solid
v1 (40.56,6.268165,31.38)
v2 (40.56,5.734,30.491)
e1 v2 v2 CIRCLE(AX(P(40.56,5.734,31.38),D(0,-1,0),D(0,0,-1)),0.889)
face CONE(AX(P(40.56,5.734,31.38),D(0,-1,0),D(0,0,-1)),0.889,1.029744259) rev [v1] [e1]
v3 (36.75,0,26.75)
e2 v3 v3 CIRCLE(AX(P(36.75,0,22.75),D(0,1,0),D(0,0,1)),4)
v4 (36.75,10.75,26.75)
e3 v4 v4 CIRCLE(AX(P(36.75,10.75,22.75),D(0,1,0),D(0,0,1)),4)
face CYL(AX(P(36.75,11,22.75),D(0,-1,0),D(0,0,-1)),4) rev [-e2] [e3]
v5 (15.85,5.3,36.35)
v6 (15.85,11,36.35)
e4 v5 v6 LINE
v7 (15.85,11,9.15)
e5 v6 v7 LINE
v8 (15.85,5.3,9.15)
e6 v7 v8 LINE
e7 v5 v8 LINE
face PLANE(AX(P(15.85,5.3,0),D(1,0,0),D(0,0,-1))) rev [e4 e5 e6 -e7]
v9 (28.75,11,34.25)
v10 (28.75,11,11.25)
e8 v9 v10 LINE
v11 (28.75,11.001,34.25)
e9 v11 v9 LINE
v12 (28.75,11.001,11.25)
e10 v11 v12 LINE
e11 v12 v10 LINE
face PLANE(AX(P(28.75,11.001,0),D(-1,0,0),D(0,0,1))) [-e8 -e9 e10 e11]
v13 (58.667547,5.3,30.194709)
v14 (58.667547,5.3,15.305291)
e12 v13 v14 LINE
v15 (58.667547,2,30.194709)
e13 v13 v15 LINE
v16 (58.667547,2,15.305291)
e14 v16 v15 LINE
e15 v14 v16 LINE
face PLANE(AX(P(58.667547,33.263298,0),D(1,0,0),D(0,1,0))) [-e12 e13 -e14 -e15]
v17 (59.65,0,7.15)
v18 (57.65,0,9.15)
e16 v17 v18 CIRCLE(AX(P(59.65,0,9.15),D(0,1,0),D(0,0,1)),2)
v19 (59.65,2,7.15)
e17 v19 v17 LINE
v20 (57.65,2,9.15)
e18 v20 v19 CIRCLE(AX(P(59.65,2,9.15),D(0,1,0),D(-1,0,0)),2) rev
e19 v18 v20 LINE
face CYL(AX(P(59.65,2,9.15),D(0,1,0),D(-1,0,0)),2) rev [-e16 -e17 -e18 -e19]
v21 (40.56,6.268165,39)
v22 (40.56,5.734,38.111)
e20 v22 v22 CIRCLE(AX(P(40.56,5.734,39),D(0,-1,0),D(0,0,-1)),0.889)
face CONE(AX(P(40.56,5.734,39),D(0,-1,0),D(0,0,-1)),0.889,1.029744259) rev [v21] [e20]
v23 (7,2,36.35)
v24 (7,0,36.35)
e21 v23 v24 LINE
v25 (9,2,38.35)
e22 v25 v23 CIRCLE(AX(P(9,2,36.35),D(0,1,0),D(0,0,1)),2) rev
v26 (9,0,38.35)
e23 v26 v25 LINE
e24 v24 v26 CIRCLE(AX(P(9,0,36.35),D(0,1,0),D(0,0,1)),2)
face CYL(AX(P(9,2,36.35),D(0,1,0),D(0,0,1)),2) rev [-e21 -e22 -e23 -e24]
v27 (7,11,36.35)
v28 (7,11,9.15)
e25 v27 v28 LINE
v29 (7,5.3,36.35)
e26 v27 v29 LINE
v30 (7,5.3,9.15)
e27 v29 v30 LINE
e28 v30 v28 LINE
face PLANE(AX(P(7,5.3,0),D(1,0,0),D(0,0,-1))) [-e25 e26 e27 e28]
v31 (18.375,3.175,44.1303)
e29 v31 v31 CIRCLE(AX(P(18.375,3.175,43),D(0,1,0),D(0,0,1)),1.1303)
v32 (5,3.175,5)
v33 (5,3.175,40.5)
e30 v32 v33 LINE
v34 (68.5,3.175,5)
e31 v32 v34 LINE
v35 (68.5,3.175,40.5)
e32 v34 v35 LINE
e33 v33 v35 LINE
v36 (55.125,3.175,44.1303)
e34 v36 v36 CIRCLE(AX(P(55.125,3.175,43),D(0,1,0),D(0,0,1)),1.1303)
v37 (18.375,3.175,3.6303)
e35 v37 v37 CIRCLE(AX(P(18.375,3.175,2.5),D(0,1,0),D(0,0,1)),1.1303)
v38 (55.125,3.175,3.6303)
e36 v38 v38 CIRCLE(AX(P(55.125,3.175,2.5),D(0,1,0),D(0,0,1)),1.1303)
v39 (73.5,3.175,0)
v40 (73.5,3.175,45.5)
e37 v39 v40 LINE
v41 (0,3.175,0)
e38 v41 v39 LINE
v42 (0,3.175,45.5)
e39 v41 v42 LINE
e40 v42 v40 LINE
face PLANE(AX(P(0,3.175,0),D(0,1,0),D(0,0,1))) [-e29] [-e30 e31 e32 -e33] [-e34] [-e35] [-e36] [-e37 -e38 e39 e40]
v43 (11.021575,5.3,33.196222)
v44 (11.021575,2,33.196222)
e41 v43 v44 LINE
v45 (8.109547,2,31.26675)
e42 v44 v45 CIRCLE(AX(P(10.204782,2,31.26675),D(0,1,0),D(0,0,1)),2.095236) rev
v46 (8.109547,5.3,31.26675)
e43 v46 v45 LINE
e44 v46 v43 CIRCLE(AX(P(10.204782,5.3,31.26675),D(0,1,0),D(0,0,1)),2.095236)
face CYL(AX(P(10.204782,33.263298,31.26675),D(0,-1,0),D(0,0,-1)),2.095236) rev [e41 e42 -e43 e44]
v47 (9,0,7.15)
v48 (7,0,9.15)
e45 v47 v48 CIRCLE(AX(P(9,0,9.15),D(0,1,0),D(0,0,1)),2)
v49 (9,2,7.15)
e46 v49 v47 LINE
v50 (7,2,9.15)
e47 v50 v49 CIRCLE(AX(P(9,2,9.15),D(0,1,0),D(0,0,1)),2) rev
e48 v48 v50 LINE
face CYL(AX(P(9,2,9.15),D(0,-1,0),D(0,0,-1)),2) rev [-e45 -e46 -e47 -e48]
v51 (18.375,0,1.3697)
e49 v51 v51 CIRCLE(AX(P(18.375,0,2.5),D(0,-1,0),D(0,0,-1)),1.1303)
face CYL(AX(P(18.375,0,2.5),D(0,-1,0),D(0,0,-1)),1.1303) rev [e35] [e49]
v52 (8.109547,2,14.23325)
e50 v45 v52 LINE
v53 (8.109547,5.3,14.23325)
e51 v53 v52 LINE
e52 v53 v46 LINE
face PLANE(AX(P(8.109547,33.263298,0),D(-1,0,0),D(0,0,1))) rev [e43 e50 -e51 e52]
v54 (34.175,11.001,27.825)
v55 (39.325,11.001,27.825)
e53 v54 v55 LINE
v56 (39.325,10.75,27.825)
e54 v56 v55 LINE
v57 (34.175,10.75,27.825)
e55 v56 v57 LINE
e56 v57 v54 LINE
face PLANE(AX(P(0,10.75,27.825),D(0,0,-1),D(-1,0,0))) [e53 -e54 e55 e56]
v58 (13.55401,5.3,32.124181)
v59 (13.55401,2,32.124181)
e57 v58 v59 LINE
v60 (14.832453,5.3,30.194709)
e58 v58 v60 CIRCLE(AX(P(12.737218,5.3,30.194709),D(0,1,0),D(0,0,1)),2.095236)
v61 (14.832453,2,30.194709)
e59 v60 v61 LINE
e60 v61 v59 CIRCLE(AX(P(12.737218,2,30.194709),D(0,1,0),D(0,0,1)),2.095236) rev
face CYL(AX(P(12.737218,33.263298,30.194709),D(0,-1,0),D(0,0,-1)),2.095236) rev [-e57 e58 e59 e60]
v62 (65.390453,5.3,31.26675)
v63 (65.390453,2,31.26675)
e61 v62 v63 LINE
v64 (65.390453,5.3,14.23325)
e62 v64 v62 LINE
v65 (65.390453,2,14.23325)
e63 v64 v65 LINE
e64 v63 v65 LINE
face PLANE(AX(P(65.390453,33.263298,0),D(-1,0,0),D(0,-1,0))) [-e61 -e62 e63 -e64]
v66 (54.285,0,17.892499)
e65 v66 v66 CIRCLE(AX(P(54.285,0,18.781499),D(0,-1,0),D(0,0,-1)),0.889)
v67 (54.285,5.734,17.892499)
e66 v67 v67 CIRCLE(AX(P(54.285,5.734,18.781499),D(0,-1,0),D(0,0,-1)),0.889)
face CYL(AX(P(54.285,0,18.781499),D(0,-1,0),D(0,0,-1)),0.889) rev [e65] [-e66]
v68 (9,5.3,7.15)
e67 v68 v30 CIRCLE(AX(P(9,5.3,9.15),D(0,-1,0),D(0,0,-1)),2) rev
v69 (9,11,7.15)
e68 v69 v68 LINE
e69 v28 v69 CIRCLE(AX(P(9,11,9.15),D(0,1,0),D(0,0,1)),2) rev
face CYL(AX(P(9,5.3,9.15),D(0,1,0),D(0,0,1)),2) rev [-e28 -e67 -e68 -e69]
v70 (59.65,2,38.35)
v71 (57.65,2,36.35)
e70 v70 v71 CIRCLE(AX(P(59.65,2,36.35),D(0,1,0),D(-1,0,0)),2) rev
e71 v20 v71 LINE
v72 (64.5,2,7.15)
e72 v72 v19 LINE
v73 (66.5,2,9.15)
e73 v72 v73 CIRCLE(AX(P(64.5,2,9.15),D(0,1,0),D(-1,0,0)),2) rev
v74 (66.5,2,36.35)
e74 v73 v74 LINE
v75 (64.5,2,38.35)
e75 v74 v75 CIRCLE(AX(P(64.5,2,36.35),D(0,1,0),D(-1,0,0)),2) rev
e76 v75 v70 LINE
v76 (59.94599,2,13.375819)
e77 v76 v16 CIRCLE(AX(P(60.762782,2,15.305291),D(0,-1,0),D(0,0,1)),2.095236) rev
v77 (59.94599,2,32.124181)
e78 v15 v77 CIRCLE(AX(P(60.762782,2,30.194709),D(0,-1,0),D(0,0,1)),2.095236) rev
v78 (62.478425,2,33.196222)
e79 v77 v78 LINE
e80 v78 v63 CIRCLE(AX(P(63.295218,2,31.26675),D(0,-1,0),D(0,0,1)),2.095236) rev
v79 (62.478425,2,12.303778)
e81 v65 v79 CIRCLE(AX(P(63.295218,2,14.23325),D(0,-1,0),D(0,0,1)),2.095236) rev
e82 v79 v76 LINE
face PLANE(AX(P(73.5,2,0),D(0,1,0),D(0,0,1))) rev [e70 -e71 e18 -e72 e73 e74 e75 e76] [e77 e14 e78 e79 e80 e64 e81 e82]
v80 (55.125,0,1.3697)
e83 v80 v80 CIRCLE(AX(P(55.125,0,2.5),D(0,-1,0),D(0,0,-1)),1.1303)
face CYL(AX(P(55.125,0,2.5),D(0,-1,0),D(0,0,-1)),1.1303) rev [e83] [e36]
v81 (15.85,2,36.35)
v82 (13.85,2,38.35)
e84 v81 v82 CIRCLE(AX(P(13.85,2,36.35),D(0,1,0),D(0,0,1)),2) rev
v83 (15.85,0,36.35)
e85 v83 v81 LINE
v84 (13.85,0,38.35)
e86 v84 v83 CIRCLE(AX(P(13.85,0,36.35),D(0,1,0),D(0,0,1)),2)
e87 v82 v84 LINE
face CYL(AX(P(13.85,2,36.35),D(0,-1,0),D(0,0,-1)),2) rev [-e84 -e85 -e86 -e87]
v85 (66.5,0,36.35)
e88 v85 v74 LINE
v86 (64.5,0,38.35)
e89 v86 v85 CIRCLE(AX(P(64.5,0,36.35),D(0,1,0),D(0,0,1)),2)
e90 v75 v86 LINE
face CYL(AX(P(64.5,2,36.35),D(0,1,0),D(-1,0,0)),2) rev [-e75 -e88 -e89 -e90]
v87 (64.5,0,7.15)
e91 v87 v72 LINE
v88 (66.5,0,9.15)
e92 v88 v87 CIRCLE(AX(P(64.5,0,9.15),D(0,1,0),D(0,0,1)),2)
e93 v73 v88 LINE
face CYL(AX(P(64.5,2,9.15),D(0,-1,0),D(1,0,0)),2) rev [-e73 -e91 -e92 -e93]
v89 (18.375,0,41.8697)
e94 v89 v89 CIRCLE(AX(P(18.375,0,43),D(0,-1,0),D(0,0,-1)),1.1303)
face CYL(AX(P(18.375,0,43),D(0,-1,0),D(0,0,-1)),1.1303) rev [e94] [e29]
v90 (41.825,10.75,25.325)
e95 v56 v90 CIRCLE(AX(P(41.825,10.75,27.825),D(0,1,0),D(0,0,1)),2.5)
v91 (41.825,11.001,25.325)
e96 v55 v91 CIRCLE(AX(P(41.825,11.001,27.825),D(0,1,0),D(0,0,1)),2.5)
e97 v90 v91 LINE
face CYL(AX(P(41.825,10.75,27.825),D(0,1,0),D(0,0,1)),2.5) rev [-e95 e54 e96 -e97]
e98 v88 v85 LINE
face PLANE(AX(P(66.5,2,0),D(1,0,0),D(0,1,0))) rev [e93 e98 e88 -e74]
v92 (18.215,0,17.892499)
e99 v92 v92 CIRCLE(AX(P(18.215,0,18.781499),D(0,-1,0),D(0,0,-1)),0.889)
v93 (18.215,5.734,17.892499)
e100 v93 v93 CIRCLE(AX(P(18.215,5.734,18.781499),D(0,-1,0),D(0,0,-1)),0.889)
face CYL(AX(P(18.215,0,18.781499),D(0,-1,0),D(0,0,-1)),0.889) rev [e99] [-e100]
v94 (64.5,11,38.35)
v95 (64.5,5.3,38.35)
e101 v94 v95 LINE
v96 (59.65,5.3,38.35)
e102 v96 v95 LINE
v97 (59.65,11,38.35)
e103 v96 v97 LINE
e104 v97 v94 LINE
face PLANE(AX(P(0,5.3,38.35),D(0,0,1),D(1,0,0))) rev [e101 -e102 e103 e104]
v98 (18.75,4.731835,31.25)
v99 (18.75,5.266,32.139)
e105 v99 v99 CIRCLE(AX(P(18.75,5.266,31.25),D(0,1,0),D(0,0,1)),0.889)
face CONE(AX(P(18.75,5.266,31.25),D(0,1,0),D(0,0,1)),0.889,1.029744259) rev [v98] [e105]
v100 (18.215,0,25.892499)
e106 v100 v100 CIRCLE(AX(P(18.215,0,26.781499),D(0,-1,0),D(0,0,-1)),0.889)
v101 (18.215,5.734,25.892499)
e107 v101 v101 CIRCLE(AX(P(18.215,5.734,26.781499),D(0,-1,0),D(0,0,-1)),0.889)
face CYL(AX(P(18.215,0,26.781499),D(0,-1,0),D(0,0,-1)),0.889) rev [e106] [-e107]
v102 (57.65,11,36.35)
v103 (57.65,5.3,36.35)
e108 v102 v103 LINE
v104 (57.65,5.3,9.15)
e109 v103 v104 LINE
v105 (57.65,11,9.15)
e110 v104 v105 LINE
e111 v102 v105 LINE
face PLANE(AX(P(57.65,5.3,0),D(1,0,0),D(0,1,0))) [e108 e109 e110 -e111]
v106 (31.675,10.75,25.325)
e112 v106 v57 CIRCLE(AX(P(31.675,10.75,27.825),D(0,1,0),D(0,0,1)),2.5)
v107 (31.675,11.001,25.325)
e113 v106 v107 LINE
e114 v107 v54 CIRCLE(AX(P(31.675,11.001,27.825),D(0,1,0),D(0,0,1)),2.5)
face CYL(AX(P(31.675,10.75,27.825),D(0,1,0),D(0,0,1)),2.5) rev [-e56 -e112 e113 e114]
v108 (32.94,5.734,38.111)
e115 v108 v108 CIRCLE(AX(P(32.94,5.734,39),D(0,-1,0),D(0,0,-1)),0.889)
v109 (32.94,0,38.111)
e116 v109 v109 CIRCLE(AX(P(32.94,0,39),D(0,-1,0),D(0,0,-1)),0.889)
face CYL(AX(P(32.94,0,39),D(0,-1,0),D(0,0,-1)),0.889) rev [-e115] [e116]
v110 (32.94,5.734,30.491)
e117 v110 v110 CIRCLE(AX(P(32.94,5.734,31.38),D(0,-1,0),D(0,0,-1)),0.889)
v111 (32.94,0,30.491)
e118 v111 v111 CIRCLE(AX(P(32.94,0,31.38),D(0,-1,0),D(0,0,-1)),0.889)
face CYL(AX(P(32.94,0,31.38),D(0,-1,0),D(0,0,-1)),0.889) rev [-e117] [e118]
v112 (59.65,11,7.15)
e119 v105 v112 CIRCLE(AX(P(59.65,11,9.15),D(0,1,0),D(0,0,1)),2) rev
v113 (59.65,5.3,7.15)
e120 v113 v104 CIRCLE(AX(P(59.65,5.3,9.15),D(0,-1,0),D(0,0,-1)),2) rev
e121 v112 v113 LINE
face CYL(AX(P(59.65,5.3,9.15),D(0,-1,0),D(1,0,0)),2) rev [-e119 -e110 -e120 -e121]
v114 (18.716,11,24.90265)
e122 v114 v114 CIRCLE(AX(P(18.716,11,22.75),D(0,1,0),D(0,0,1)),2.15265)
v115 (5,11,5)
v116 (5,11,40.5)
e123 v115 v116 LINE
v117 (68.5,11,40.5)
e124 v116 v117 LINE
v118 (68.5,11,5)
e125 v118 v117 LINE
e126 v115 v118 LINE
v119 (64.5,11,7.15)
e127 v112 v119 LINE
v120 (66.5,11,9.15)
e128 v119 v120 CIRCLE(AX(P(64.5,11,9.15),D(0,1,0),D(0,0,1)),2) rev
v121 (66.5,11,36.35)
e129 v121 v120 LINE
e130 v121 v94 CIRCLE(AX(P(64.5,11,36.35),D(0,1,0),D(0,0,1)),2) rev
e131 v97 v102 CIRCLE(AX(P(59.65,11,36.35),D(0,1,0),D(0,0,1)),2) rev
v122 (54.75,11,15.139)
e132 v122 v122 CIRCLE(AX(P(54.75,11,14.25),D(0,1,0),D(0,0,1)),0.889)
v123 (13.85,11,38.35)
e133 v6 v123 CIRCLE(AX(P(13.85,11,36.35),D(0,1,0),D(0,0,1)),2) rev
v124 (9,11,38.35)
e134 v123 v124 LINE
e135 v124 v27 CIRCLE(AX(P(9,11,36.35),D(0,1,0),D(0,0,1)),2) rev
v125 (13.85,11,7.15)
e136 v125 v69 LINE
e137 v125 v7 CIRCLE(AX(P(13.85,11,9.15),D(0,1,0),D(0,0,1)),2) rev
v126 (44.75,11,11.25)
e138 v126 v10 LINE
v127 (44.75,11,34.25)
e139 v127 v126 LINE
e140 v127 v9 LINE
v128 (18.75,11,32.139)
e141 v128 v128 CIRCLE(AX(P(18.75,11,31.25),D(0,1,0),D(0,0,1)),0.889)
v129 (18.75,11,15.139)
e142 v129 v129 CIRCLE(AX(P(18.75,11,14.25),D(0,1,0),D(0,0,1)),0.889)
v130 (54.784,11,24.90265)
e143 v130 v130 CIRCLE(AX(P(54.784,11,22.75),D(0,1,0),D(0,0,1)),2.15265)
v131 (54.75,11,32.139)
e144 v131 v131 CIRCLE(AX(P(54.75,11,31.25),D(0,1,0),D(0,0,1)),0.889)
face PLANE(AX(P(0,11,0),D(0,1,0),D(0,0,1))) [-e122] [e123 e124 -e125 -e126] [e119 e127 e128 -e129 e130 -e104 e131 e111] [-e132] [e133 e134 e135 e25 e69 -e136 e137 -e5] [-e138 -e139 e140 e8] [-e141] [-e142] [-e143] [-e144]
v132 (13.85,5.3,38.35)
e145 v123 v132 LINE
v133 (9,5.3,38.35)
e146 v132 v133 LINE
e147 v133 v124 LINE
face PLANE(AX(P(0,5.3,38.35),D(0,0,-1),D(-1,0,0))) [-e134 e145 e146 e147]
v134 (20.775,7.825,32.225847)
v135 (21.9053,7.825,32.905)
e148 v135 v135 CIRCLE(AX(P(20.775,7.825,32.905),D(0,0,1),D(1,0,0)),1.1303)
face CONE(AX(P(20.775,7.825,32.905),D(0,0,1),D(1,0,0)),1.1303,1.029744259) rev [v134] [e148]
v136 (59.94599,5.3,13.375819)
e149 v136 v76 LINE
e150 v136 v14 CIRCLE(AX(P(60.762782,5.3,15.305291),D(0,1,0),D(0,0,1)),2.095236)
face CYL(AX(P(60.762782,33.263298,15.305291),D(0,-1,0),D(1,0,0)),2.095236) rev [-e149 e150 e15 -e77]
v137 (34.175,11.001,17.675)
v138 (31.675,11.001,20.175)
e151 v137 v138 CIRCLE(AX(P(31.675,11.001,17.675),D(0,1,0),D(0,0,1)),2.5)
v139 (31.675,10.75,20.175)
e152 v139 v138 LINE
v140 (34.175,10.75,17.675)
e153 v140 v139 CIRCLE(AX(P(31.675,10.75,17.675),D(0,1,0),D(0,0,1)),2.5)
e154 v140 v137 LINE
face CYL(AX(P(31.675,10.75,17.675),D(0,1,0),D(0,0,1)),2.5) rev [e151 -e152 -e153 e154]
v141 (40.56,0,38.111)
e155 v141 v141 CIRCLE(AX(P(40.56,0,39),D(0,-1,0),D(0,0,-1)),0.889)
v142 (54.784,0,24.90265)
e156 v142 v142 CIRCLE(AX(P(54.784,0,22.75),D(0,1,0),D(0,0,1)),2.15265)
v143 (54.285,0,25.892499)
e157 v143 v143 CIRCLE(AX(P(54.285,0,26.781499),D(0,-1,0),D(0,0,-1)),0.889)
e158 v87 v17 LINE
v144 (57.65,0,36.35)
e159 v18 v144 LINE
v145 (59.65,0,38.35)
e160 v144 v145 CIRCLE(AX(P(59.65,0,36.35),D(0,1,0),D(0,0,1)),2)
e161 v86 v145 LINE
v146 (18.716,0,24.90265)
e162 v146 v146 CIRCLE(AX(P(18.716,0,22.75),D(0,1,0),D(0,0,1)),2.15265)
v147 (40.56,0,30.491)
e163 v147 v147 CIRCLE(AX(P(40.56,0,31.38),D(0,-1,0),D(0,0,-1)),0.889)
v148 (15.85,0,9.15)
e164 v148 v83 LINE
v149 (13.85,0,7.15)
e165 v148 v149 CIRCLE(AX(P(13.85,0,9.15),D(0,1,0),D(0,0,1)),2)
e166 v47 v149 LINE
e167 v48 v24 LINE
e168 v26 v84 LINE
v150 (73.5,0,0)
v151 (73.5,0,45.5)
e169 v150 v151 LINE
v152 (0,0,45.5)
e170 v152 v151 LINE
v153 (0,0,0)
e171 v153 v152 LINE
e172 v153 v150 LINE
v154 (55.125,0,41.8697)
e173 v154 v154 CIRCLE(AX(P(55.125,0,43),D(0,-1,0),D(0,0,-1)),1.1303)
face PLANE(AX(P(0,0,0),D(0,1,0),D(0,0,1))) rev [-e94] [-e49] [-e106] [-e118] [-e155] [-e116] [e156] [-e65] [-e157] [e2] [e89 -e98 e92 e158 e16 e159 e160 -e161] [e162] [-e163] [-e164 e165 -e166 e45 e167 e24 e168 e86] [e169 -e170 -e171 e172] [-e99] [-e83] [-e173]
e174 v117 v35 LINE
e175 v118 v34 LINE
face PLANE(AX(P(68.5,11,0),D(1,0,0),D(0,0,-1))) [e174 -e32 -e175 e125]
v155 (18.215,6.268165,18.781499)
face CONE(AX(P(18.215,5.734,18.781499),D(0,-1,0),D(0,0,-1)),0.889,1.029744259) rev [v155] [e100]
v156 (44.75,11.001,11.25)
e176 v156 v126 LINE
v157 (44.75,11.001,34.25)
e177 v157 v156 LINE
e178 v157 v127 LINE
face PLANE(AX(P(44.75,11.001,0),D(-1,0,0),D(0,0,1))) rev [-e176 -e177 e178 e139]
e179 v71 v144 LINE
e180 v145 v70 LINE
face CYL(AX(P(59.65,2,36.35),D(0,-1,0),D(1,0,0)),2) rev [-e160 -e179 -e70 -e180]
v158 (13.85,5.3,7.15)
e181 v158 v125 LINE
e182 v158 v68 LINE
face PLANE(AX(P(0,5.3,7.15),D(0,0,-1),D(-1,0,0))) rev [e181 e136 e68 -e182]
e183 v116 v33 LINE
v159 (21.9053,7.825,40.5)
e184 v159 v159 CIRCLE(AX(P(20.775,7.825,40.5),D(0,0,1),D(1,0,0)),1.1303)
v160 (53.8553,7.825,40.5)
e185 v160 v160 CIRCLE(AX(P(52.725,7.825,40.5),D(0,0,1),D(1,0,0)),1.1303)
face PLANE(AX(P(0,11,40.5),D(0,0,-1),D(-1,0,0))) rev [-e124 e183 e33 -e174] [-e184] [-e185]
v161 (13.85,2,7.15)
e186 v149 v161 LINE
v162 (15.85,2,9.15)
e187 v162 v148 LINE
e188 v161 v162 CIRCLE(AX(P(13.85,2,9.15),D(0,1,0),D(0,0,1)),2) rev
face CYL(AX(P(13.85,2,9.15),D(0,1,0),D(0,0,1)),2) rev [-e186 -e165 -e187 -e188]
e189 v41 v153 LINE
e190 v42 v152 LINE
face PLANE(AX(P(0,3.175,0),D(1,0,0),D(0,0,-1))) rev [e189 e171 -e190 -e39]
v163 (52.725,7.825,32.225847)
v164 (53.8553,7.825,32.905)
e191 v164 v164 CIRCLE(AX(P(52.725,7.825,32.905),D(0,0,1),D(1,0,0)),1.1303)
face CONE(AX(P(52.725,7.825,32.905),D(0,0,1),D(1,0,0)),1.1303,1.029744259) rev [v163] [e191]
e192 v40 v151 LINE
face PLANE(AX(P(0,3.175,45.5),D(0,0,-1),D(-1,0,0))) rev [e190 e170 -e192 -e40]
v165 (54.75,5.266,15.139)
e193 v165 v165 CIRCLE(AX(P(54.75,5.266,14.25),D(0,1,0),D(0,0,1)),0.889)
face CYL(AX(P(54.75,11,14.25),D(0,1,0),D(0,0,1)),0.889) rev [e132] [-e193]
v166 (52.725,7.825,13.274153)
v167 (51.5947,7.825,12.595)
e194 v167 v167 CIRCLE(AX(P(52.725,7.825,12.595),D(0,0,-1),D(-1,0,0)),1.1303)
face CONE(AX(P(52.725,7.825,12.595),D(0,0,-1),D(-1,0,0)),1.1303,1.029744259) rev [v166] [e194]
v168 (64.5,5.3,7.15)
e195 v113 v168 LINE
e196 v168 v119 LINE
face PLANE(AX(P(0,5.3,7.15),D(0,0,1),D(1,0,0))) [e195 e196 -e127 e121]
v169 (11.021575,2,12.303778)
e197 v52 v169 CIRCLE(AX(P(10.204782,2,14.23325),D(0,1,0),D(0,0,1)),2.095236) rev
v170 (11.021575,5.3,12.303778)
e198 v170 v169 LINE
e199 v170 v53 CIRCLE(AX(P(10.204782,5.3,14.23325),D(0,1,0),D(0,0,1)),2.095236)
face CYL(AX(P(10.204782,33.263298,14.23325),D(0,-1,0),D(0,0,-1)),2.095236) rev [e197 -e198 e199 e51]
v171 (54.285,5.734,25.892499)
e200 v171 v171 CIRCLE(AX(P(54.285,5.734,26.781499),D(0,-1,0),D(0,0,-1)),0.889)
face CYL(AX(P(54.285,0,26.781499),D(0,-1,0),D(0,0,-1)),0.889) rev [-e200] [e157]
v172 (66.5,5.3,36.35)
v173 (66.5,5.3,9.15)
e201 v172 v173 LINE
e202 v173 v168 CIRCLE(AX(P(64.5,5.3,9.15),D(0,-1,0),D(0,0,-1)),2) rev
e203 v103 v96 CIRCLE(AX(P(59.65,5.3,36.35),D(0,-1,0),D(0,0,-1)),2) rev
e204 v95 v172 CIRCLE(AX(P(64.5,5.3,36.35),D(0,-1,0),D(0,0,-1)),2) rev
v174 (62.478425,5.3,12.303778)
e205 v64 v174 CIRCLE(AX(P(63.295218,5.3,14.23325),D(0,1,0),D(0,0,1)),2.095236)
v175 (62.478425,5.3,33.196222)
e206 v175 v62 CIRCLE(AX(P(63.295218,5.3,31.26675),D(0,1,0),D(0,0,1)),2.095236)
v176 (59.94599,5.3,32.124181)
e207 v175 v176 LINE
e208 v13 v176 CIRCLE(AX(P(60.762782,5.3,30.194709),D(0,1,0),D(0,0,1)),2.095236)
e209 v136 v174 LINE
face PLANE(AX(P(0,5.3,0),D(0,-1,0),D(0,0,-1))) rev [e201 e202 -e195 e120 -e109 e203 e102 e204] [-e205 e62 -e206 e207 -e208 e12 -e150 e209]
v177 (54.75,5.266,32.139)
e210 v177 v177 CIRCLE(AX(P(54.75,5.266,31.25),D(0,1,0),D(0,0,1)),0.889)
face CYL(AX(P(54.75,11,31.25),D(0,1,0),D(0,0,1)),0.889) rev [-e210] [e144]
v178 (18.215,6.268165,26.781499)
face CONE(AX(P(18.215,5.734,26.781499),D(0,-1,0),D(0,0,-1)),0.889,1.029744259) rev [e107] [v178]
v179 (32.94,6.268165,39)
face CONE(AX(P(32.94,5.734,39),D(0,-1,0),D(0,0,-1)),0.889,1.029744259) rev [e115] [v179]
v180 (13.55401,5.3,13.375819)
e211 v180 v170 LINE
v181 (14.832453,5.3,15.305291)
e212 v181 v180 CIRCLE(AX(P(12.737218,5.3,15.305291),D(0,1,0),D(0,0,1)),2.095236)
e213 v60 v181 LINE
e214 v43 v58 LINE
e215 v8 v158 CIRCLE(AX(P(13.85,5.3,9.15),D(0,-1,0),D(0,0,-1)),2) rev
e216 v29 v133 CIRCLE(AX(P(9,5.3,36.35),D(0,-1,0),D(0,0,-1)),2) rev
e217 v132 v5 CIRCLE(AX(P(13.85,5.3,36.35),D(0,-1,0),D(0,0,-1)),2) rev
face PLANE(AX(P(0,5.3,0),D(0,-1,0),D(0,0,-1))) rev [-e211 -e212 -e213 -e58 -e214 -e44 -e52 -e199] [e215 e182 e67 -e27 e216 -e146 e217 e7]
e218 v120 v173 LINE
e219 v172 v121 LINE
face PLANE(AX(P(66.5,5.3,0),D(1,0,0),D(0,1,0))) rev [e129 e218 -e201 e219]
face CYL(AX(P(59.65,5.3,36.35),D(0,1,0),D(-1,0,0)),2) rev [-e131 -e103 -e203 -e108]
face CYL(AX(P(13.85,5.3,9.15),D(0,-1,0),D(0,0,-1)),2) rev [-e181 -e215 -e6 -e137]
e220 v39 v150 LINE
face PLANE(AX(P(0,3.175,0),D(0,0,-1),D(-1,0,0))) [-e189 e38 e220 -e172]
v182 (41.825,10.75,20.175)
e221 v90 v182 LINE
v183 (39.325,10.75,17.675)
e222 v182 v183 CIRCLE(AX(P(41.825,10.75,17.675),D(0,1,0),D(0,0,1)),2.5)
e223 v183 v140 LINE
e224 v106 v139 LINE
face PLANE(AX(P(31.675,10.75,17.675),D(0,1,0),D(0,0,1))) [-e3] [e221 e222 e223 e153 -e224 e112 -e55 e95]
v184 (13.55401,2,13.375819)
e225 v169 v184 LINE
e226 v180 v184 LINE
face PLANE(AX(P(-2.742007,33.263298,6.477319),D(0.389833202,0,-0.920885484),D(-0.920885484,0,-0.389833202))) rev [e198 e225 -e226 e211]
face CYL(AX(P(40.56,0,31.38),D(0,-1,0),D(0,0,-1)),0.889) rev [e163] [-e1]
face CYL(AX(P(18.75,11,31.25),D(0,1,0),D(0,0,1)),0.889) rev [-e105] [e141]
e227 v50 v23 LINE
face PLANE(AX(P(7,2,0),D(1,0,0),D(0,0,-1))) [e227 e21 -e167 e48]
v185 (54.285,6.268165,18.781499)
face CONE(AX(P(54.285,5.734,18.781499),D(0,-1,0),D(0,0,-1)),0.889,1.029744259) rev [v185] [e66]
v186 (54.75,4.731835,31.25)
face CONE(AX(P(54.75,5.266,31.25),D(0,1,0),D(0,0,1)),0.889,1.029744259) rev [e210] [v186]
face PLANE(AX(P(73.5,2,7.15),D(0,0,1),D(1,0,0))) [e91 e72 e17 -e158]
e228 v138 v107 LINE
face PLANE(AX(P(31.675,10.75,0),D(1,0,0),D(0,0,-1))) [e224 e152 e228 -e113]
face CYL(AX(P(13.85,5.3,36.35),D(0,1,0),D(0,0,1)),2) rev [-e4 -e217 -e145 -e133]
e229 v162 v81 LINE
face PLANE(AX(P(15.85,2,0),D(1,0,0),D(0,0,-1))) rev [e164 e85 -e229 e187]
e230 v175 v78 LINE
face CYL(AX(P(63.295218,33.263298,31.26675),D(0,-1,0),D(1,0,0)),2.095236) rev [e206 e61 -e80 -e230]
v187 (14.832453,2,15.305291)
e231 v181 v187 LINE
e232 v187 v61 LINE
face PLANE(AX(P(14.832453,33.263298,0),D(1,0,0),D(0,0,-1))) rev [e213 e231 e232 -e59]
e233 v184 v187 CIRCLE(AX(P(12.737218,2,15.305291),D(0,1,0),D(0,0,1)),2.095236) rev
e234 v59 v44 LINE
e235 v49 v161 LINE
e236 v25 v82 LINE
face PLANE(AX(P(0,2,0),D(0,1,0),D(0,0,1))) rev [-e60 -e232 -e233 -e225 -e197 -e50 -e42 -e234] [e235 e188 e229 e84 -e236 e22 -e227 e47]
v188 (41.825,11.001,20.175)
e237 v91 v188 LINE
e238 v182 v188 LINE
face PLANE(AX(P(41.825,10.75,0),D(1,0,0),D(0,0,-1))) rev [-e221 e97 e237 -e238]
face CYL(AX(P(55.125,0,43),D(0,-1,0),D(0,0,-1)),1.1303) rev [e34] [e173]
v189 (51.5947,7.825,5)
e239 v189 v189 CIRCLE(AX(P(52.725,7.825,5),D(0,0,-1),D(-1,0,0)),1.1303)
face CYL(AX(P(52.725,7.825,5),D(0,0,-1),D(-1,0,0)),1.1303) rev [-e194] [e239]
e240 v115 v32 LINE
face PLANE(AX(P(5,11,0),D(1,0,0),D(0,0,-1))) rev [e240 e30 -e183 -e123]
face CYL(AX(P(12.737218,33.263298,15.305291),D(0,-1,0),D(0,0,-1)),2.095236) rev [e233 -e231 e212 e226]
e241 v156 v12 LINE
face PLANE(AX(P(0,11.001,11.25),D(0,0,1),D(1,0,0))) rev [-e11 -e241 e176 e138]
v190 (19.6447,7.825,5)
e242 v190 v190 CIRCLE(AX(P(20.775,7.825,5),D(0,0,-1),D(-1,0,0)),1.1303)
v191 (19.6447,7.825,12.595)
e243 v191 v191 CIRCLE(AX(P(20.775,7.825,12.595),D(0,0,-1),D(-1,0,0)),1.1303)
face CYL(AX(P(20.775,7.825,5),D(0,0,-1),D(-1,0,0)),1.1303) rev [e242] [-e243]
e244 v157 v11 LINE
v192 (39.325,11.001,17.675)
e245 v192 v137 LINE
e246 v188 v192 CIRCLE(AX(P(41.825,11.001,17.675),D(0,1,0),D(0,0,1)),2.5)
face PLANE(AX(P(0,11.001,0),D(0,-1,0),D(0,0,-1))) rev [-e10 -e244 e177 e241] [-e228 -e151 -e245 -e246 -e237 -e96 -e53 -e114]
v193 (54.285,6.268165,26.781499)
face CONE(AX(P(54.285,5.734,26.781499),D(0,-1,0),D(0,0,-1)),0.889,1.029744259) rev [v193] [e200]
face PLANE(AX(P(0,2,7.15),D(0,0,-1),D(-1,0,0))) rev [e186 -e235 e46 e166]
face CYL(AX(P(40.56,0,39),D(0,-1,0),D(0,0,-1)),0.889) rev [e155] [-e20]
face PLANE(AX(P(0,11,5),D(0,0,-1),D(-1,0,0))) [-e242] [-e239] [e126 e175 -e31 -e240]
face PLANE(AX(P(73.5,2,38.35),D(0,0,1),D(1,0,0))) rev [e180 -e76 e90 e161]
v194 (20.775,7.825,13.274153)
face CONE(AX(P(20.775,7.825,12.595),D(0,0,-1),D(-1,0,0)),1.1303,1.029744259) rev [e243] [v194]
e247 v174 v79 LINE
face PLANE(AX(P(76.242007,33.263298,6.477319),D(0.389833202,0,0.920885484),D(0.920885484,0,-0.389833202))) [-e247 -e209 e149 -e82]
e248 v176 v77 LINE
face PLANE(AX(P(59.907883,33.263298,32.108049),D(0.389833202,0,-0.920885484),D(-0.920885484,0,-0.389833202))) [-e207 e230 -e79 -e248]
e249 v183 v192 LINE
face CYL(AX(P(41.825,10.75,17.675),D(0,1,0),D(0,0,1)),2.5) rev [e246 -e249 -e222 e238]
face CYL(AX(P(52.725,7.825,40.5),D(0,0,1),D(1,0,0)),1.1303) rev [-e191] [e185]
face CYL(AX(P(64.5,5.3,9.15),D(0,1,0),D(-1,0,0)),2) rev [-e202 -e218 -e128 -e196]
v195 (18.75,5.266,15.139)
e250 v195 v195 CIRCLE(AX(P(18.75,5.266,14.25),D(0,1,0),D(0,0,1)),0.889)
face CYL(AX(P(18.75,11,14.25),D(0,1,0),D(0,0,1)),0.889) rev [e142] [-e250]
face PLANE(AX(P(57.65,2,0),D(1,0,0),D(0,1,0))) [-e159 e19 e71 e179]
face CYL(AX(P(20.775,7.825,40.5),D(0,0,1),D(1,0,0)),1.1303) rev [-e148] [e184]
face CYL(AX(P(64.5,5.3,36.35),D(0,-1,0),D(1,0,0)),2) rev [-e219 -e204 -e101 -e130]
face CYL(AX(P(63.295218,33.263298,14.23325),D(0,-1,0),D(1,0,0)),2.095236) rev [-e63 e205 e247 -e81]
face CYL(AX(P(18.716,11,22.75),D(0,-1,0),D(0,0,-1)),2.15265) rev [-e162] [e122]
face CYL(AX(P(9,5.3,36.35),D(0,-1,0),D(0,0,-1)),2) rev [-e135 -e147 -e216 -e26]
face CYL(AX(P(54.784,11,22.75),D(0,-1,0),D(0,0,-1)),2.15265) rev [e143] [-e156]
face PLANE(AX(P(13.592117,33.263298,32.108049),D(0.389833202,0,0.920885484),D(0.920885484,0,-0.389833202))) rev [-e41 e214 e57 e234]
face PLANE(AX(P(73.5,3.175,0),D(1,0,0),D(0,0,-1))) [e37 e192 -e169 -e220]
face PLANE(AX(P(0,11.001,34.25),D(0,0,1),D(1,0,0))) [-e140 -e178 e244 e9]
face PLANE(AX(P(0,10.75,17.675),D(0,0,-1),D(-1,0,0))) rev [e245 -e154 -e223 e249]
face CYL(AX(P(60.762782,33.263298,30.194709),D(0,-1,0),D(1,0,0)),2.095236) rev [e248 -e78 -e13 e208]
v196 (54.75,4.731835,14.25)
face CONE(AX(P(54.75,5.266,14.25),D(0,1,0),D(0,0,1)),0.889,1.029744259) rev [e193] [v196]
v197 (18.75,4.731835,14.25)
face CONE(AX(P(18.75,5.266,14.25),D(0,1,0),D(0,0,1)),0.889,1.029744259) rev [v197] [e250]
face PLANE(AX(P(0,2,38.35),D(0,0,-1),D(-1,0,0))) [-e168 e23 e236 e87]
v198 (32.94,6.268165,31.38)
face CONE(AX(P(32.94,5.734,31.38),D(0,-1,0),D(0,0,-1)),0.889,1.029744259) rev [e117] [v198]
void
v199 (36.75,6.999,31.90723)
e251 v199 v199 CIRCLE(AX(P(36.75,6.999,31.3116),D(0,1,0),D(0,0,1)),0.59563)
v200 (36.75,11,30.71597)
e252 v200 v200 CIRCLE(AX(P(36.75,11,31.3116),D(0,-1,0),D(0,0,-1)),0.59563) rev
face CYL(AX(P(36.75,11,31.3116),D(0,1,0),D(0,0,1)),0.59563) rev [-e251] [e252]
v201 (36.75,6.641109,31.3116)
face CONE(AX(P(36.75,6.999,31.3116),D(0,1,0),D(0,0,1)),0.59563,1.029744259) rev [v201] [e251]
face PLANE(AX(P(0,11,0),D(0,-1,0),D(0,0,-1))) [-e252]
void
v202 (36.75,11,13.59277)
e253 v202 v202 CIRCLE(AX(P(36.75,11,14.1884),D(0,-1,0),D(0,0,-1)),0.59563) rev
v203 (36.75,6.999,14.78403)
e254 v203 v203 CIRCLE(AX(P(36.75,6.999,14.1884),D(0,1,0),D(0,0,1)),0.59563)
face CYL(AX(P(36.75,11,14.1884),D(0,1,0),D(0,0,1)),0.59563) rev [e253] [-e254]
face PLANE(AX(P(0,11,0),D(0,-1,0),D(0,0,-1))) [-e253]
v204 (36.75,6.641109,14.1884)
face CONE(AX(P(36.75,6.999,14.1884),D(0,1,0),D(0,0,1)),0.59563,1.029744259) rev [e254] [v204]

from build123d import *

# Parameters (mm, degrees)
MAIN_SKETCH_W                         = 73.5
MAIN_SKETCH_H                         = 45.5
MAIN_SKETCH_W_2                       = 63.5
MAIN_SKETCH_H_2                       = 35.5
LIP_DEPTH                             = 3.175
MOUNTING_BASE_OUTLINE_W               = 63.5
MOUNTING_BASE_OUTLINE_H               = 35.5
MOUNTING_BASE_OUTLINE_R               = 2.15265
MOUNTING_BASE_OUTLINE_R_2             = 4
MOUNTING_BASE_DEPTH                   = 11
HEATER_CART_4_40_TAPS_D               = 2.2606
HEATER_CART_4_40_TAPS_DEPTH           = 7.595
HEATER_CART_4_40_TAPS_TIP             = 0.679152758
HEATER_CART_4_40_TAPS_ON_FACE_2_D     = 2.2606
HEATER_CART_4_40_TAPS_ON_FACE_2_DEPTH = 7.595
HEATER_CART_4_40_TAPS_ON_FACE_2_TIP   = 0.679152758
MAIN_SKETCH_12_W                      = 8.85
MAIN_SKETCH_12_H                      = 31.2
BOTTOM_SQUARE_CUTOUT_DEPTH            = 2
SQUARE_MICRO_D_CUTOUT_START           = 5.3
SQUARE_MICRO_D_CUTOUT_OUTLINE_W       = 8.85
SQUARE_MICRO_D_CUTOUT_OUTLINE_H       = 31.2
SQUARE_MICRO_D_CUTOUT_DEPTH           = 5.7
MAIN_SKETCH_7_R                       = 0.285
ROUND_MICRO_D_CUTOUT_DEPTH            = 11
INTERNAL_CORNER_CUTOUTS_FILLET_R      = 2
CHIP_CLAMP_0_80_TAPS_AT_2_COUNT       = 2
CHIP_CLAMP_0_80_TAPS_AT_2_PITCH       = 17.1232
CHIP_CLAMP_0_80_TAPS_AT_3_COUNT       = 2
CHIP_CLAMP_0_80_TAPS_AT_3_PITCH       = 17.1232
CHIP_POCKET_START                     = 11
MAIN_SKETCH_6_R                       = 2.5
MAIN_SKETCH_6_W                       = 10.15
MAIN_SKETCH_6_H                       = 10.15
CHIP_POCKET_DEPTH                     = 0.25
F_2_56_CLOSE_CLEAR_43_0_089_D         = 2.2606
PCB_2_56_TAPS_D                       = 1.778
PCB_2_56_TAPS_DEPTH                   = 5.734
PCB_2_56_TAPS_TIP                     = 0.53416509
BOTTOM_COVER_2_56_TAPS_D              = 1.778
BOTTOM_COVER_2_56_TAPS_DEPTH          = 5.734
BOTTOM_COVER_2_56_TAPS_TIP            = 0.53416509
F_2_56_TAPPED_HOLE1_D                 = 1.778
F_2_56_TAPPED_HOLE1_DEPTH             = 5.734
F_2_56_TAPPED_HOLE1_TIP               = 0.53416509
SUPRESS_START                         = 11.001
SKETCH14_W                            = 16
SKETCH14_H                            = 23
SUPRESS_IF_NOT_SIMULATING_DEPTH       = 0.001


# Read off the part's stored shape, not the designer's step: Mounting_Base, Square_Micro_D_Cutout
with BuildPart() as part:
    # Main_Sketch → Lip (new body)
    with BuildSketch(Plane(origin=(0, 0, 0), x_dir=(1, 0, 0), z_dir=(0, 1, 0))):
        with Locations((36.75, -22.75)):
            Rectangle(MAIN_SKETCH_W, MAIN_SKETCH_H)
        with Locations((36.75, -22.75)):
            Rectangle(MAIN_SKETCH_W_2, MAIN_SKETCH_H_2, mode=Mode.SUBTRACT)
    extrude(amount=LIP_DEPTH)

    # Mounting_Base outline → Mounting_Base (add)
    with BuildSketch(Plane(origin=(0, 0, 0), x_dir=(1, 0, 0), z_dir=(0, 1, 0))):
        with Locations((36.75, -22.75)):
            Rectangle(MOUNTING_BASE_OUTLINE_W, MOUNTING_BASE_OUTLINE_H)
        with Locations((18.716, -22.75)):
            Circle(MOUNTING_BASE_OUTLINE_R, mode=Mode.SUBTRACT)
        with Locations((36.75, -22.75)):
            Circle(MOUNTING_BASE_OUTLINE_R_2, mode=Mode.SUBTRACT)
        with Locations((54.784, -22.75)):
            Circle(MOUNTING_BASE_OUTLINE_R, mode=Mode.SUBTRACT)
    extrude(amount=MOUNTING_BASE_DEPTH)

    # Heater_Cart_#4-40_Taps
    with Locations(Plane(origin=(52.725, 7.825, 5), x_dir=(-1, 0, 0), z_dir=(0, 0, -1))):
        with Locations((0, 0), (31.95, 0)):
            Hole(HEATER_CART_4_40_TAPS_D / 2, depth=HEATER_CART_4_40_TAPS_DEPTH)
            with Locations((0, 0, -(HEATER_CART_4_40_TAPS_DEPTH + HEATER_CART_4_40_TAPS_TIP / 2))):  # 118° drill point
                Cone(0, HEATER_CART_4_40_TAPS_D / 2, HEATER_CART_4_40_TAPS_TIP, mode=Mode.SUBTRACT)

    # Heater_Cart_#4-40_Taps on face 2
    with Locations(Plane(origin=(20.775, 7.825, 40.5), x_dir=(1, 0, 0), z_dir=(0, 0, 1))):
        with Locations((0, 0), (31.95, 0)):
            Hole(HEATER_CART_4_40_TAPS_ON_FACE_2_D / 2, depth=HEATER_CART_4_40_TAPS_ON_FACE_2_DEPTH)
            with Locations((0, 0, -(HEATER_CART_4_40_TAPS_ON_FACE_2_DEPTH + HEATER_CART_4_40_TAPS_ON_FACE_2_TIP / 2))):  # 118° drill point
                Cone(0, HEATER_CART_4_40_TAPS_ON_FACE_2_D / 2, HEATER_CART_4_40_TAPS_ON_FACE_2_TIP, mode=Mode.SUBTRACT)

    # Main_Sketch<12> → Bottom_square_cutout (cut)
    with BuildSketch(Plane(origin=(0, 0, 0), x_dir=(1, 0, 0), z_dir=(0, 1, 0))):
        with Locations((11.425, -22.75)):
            Rectangle(MAIN_SKETCH_12_W, MAIN_SKETCH_12_H)
        with BuildLine():
            ThreePointArc((11.021574965, -33.196222286), (9.996212222, -33.351578951), (9.021946869, -32.996175702))
            ThreePointArc((9.021946869, -32.996175702), (8.351632057, -32.244424217), (8.109546604, -31.26675))
            Line((8.109546604, -31.26675), (8.109546604, -14.23325))
            ThreePointArc((8.109546604, -14.23325), (8.351632057, -13.255575783), (9.021946869, -12.503824298))
            ThreePointArc((9.021946869, -12.503824298), (9.996212222, -12.148421049), (11.021574965, -12.303777714))
            Line((11.021574965, -12.303777714), (13.554010046, -13.37581902))
            ThreePointArc((13.554010046, -13.37581902), (14.483840891, -14.148001292), (14.8324534, -15.305291306))
            Line((14.8324534, -15.305291306), (14.8324534, -30.194708694))
            ThreePointArc((14.8324534, -30.194708694), (14.483840891, -31.351998708), (13.554010046, -32.12418098))
            Line((13.554010046, -32.12418098), (11.021574965, -33.196222286))
        make_face(mode=Mode.SUBTRACT)
    bottom_square_cutout = extrude(amount=BOTTOM_SQUARE_CUTOUT_DEPTH, mode=Mode.SUBTRACT)

    # Square_Micro_D_Cutout outline → Square_Micro_D_Cutout (cut)
    with BuildSketch(Plane(origin=(0, 0, 0), x_dir=(1, 0, 0), z_dir=(0, 1, 0)).offset(SQUARE_MICRO_D_CUTOUT_START)):
        with Locations((11.425, -22.75)):
            Rectangle(SQUARE_MICRO_D_CUTOUT_OUTLINE_W, SQUARE_MICRO_D_CUTOUT_OUTLINE_H)
        with BuildLine():
            ThreePointArc((11.021574965, -33.196222286), (9.047492447, -33.013373348), (8.109546604, -31.26675))
            Line((8.109546604, -31.26675), (8.109546604, -14.23325))
            ThreePointArc((8.109546604, -14.23325), (9.047492447, -12.486626652), (11.021574965, -12.303777714))
            Line((11.021574965, -12.303777714), (13.554010046, -13.37581902))
            ThreePointArc((13.554010046, -13.37581902), (14.483840891, -14.148001291), (14.8324534, -15.305291306))
            Line((14.8324534, -15.305291306), (14.8324534, -30.194708694))
            ThreePointArc((14.8324534, -30.194708694), (14.483840891, -31.351998709), (13.554010046, -32.12418098))
            Line((13.554010046, -32.12418098), (11.021574965, -33.196222286))
        make_face(mode=Mode.SUBTRACT)
    square_micro_d_cutout = extrude(amount=SQUARE_MICRO_D_CUTOUT_DEPTH, mode=Mode.SUBTRACT)

    # Main_Sketch<7> → Round_Micro_D_Cutout (cut)
    # profile 1 of 2: a face of its own
    with BuildSketch(Plane(origin=(0, 0, 0), x_dir=(1, 0, 0), z_dir=(0, 1, 0))):
        with BuildLine():
            ThreePointArc((9.021946869, -32.996175702), (8.351632057, -32.244424217), (8.109546604, -31.26675))
            Line((8.109546604, -31.26675), (8.109546604, -14.23325))
            ThreePointArc((8.109546604, -14.23325), (8.351632057, -13.255575783), (9.021946869, -12.503824298))
            ThreePointArc((9.021946869, -12.503824298), (9.996212222, -12.148421049), (11.021574965, -12.303777714))
            Line((11.021574965, -12.303777714), (13.554010046, -13.37581902))
            ThreePointArc((13.554010046, -13.37581902), (14.483840891, -14.148001292), (14.8324534, -15.305291306))
            Line((14.8324534, -15.305291306), (14.8324534, -30.194708694))
            ThreePointArc((14.8324534, -30.194708694), (14.483840891, -31.351998708), (13.554010046, -32.12418098))
            Line((13.554010046, -32.12418098), (11.021574965, -33.196222286))
            ThreePointArc((11.021574965, -33.196222286), (9.996212222, -33.351578951), (9.021946869, -32.996175702))
        make_face()
        with Locations((10.899546604, -22.75)):
            Circle(MAIN_SKETCH_7_R, mode=Mode.SUBTRACT)
    # profile 2 of 2: a face of its own
    with BuildSketch(Plane(origin=(0, 0, 0), x_dir=(1, 0, 0), z_dir=(0, 1, 0))):
        with Locations((10.899546604, -22.75)):
            Circle(MAIN_SKETCH_7_R)
    round_micro_d_cutout = extrude(amount=ROUND_MICRO_D_CUTOUT_DEPTH, mode=Mode.SUBTRACT)

    # MicroD_Mirror: Bottom_square_cutout, Square_Micro_D_Cutout, Round_Micro_D_Cutout across plane
    add(bottom_square_cutout.mirror(Plane(origin=(36.75, 0, 0), x_dir=(0, 0, 1), z_dir=(1, 0, 0))), mode=Mode.SUBTRACT)
    add(square_micro_d_cutout.mirror(Plane(origin=(36.75, 0, 0), x_dir=(0, 0, 1), z_dir=(1, 0, 0))), mode=Mode.SUBTRACT)
    add(round_micro_d_cutout.mirror(Plane(origin=(36.75, 0, 0), x_dir=(0, 0, 1), z_dir=(1, 0, 0))), mode=Mode.SUBTRACT)

    # Internal_Corner_cutouts_fillet
    internal_corner_cutouts_fillet_edges = [part.edges().sort_by_distance(p)[0] for p in [
        (15.85, 8.15, 38.35),
        (7, 8.15, 38.35),
        (7, 8.15, 7.15),
        (15.85, 8.15, 7.15),
        (57.65, 1, 7.15),
        (57.65, 1, 38.35),
        (66.5, 1, 38.35),
        (66.5, 1, 7.15),
        (66.5, 8.15, 7.15),
        (66.5, 8.15, 38.35),
        (57.65, 8.15, 38.35),
        (57.65, 8.15, 7.15),
        (15.85, 1, 38.35),
        (15.85, 1, 7.15),
        (7, 1, 7.15),
        (7, 1, 38.35),
    ]]
    fillet(internal_corner_cutouts_fillet_edges, radius=INTERNAL_CORNER_CUTOUTS_FILLET_R)

    # Sketch3 → Chip_Clamp_#0-80 Taps (revolve, cut)
    with BuildSketch(Plane(origin=(36.75, 11, 31.3116), x_dir=(0, 0, 1), z_dir=(1, 0, 0))):
        Polygon((0, 0), (0, 4.358890611), (0.59563, 4.001), (0.59563, 0), align=None)
    chip_clamp_0_80_taps = revolve(axis=Axis((36.75, 17.35, 31.3116), (0, -1, 0)), mode=Mode.SUBTRACT)

    # Chip_Clamp_#0-80 Taps at 2: Chip_Clamp_#0-80 Taps ×2
    with Locations(*[(0, 0, -i * CHIP_CLAMP_0_80_TAPS_AT_2_PITCH) for i in range(1, CHIP_CLAMP_0_80_TAPS_AT_2_COUNT)]):
        add(chip_clamp_0_80_taps, mode=Mode.SUBTRACT)

    # Chip_Clamp_#0-80 Taps at 3: Chip_Clamp_#0-80 Taps ×2
    with Locations(*[(0, 0, -i * CHIP_CLAMP_0_80_TAPS_AT_3_PITCH) for i in range(1, CHIP_CLAMP_0_80_TAPS_AT_3_COUNT)]):
        add(chip_clamp_0_80_taps, mode=Mode.SUBTRACT)

    # Main_Sketch<6> → Chip_Pocket (cut)
    with BuildSketch(Plane(origin=(0, 0, 0), x_dir=(1, 0, 0), z_dir=(0, 1, 0)).offset(CHIP_POCKET_START)):
        with BuildLine():
            Line((31.675, -20.175), (31.675, -17.675))
            Line((31.675, -17.675), (34.175, -17.675))
            ThreePointArc((34.175, -17.675), (29.907233047, -15.907233047), (31.675, -20.175))
        make_face()
        with BuildLine():
            Line((34.175, -17.675), (31.675, -17.675))
            Line((31.675, -17.675), (31.675, -20.175))
            ThreePointArc((31.675, -20.175), (33.442766953, -19.442766953), (34.175, -17.675))
        make_face()
        with BuildLine():
            ThreePointArc((44.325, -17.675), (41.825, -15.175), (39.325, -17.675))
            Line((39.325, -17.675), (41.825, -17.675))
            Line((41.825, -17.675), (41.825, -20.175))
            ThreePointArc((41.825, -20.175), (43.592766953, -19.442766953), (44.325, -17.675))
        make_face()
        with BuildLine():
            Line((41.825, -17.675), (39.325, -17.675))
            ThreePointArc((39.325, -17.675), (40.057233047, -19.442766953), (41.825, -20.175))
            Line((41.825, -20.175), (41.825, -17.675))
        make_face()
        with BuildLine():
            ThreePointArc((34.175, -27.825), (33.442766953, -26.057233047), (31.675, -25.325))
            Line((31.675, -25.325), (31.675, -27.825))
            Line((31.675, -27.825), (34.175, -27.825))
        make_face()
        with BuildLine():
            Line((31.675, -27.825), (31.675, -25.325))
            ThreePointArc((31.675, -25.325), (29.907233047, -29.592766953), (34.175, -27.825))
            Line((34.175, -27.825), (31.675, -27.825))
        make_face()
        with BuildLine():
            ThreePointArc((44.325, -27.825), (43.592766953, -26.057233047), (41.825, -25.325))
            Line((41.825, -25.325), (41.825, -27.825))
            Line((41.825, -27.825), (39.325, -27.825))
            ThreePointArc((39.325, -27.825), (41.825, -30.325), (44.325, -27.825))
        make_face()
        with BuildLine():
            Line((41.825, -27.825), (41.825, -25.325))
            ThreePointArc((41.825, -25.325), (40.057233047, -26.057233047), (39.325, -27.825))
            Line((39.325, -27.825), (41.825, -27.825))
        make_face()
        with Locations((41.825, -27.825)):
            Circle(MAIN_SKETCH_6_R)
        with Locations((41.825, -17.675)):
            Circle(MAIN_SKETCH_6_R)
        with Locations((31.675, -17.675)):
            Circle(MAIN_SKETCH_6_R)
        with Locations((31.675, -27.825)):
            Circle(MAIN_SKETCH_6_R)
        with Locations((36.75, -22.75)):
            Rectangle(MAIN_SKETCH_6_W, MAIN_SKETCH_6_H)
    extrude(amount=-CHIP_POCKET_DEPTH, mode=Mode.SUBTRACT)

    # 2-56_Close_Clear#43 (0.089) (through all)
    with Locations(Plane(origin=(18.375, 0, 43), x_dir=(0, 0, -1), z_dir=(0, -1, 0))):
        with Locations((0, 0), (40.5, 0), (40.5, 36.75), (0, 36.75)):
            Hole(F_2_56_CLOSE_CLEAR_43_0_089_D / 2)

    # PCB #2-56 Taps
    with Locations(Plane(origin=(18.75, 11, 14.25), x_dir=(0, 0, 1), z_dir=(0, 1, 0))):
        with Locations((0, 0), (17, 0), (0, 36), (17, 36)):
            Hole(PCB_2_56_TAPS_D / 2, depth=PCB_2_56_TAPS_DEPTH)
            with Locations((0, 0, -(PCB_2_56_TAPS_DEPTH + PCB_2_56_TAPS_TIP / 2))):  # 118° drill point
                Cone(0, PCB_2_56_TAPS_D / 2, PCB_2_56_TAPS_TIP, mode=Mode.SUBTRACT)

    # Bottom_Cover#2-56 Taps
    with Locations(Plane(origin=(54.285, 0, 18.78149915), x_dir=(0, 0, -1), z_dir=(0, -1, 0))):
        with Locations((0, 0), (-8, 0), (-8, -36.07), (0, -36.07)):
            Hole(BOTTOM_COVER_2_56_TAPS_D / 2, depth=BOTTOM_COVER_2_56_TAPS_DEPTH)
            with Locations((0, 0, -(BOTTOM_COVER_2_56_TAPS_DEPTH + BOTTOM_COVER_2_56_TAPS_TIP / 2))):  # 118° drill point
                Cone(0, BOTTOM_COVER_2_56_TAPS_D / 2, BOTTOM_COVER_2_56_TAPS_TIP, mode=Mode.SUBTRACT)

    # #2-56 Tapped Hole1
    with Locations(Plane(origin=(32.94, 0, 31.38), x_dir=(0, 0, -1), z_dir=(0, -1, 0))):
        with Locations((0, 0), (-7.62, 0), (-7.62, 7.62), (0, 7.62)):
            Hole(F_2_56_TAPPED_HOLE1_D / 2, depth=F_2_56_TAPPED_HOLE1_DEPTH)
            with Locations((0, 0, -(F_2_56_TAPPED_HOLE1_DEPTH + F_2_56_TAPPED_HOLE1_TIP / 2))):  # 118° drill point
                Cone(0, F_2_56_TAPPED_HOLE1_D / 2, F_2_56_TAPPED_HOLE1_TIP, mode=Mode.SUBTRACT)

    # Sketch14 → SUPRESS IF NOT SIMULATING (add)
    with BuildSketch(Plane(origin=(0, 0, 0), x_dir=(1, 0, 0), z_dir=(0, 1, 0)).offset(SUPRESS_START)):
        with Locations((36.75, -22.75)):
            Rectangle(SKETCH14_W, SKETCH14_H)
        with BuildLine():
            ThreePointArc((31.675, -20.175), (29.907233047, -15.907233047), (34.175, -17.675))
            Line((34.175, -17.675), (39.325, -17.675))
            ThreePointArc((39.325, -17.675), (41.825, -15.175), (44.325, -17.675))
            ThreePointArc((44.325, -17.675), (43.592766953, -19.442766953), (41.825, -20.175))
            Line((41.825, -20.175), (41.825, -25.325))
            ThreePointArc((41.825, -25.325), (43.592766953, -26.057233047), (44.325, -27.825))
            ThreePointArc((44.325, -27.825), (41.825, -30.325), (39.325, -27.825))
            Line((39.325, -27.825), (34.175, -27.825))
            ThreePointArc((34.175, -27.825), (29.907233047, -29.592766953), (31.675, -25.325))
            Line((31.675, -25.325), (31.675, -20.175))
        make_face(mode=Mode.SUBTRACT)
    extrude(amount=-SUPRESS_IF_NOT_SIMULATING_DEPTH)


solid = part.part
